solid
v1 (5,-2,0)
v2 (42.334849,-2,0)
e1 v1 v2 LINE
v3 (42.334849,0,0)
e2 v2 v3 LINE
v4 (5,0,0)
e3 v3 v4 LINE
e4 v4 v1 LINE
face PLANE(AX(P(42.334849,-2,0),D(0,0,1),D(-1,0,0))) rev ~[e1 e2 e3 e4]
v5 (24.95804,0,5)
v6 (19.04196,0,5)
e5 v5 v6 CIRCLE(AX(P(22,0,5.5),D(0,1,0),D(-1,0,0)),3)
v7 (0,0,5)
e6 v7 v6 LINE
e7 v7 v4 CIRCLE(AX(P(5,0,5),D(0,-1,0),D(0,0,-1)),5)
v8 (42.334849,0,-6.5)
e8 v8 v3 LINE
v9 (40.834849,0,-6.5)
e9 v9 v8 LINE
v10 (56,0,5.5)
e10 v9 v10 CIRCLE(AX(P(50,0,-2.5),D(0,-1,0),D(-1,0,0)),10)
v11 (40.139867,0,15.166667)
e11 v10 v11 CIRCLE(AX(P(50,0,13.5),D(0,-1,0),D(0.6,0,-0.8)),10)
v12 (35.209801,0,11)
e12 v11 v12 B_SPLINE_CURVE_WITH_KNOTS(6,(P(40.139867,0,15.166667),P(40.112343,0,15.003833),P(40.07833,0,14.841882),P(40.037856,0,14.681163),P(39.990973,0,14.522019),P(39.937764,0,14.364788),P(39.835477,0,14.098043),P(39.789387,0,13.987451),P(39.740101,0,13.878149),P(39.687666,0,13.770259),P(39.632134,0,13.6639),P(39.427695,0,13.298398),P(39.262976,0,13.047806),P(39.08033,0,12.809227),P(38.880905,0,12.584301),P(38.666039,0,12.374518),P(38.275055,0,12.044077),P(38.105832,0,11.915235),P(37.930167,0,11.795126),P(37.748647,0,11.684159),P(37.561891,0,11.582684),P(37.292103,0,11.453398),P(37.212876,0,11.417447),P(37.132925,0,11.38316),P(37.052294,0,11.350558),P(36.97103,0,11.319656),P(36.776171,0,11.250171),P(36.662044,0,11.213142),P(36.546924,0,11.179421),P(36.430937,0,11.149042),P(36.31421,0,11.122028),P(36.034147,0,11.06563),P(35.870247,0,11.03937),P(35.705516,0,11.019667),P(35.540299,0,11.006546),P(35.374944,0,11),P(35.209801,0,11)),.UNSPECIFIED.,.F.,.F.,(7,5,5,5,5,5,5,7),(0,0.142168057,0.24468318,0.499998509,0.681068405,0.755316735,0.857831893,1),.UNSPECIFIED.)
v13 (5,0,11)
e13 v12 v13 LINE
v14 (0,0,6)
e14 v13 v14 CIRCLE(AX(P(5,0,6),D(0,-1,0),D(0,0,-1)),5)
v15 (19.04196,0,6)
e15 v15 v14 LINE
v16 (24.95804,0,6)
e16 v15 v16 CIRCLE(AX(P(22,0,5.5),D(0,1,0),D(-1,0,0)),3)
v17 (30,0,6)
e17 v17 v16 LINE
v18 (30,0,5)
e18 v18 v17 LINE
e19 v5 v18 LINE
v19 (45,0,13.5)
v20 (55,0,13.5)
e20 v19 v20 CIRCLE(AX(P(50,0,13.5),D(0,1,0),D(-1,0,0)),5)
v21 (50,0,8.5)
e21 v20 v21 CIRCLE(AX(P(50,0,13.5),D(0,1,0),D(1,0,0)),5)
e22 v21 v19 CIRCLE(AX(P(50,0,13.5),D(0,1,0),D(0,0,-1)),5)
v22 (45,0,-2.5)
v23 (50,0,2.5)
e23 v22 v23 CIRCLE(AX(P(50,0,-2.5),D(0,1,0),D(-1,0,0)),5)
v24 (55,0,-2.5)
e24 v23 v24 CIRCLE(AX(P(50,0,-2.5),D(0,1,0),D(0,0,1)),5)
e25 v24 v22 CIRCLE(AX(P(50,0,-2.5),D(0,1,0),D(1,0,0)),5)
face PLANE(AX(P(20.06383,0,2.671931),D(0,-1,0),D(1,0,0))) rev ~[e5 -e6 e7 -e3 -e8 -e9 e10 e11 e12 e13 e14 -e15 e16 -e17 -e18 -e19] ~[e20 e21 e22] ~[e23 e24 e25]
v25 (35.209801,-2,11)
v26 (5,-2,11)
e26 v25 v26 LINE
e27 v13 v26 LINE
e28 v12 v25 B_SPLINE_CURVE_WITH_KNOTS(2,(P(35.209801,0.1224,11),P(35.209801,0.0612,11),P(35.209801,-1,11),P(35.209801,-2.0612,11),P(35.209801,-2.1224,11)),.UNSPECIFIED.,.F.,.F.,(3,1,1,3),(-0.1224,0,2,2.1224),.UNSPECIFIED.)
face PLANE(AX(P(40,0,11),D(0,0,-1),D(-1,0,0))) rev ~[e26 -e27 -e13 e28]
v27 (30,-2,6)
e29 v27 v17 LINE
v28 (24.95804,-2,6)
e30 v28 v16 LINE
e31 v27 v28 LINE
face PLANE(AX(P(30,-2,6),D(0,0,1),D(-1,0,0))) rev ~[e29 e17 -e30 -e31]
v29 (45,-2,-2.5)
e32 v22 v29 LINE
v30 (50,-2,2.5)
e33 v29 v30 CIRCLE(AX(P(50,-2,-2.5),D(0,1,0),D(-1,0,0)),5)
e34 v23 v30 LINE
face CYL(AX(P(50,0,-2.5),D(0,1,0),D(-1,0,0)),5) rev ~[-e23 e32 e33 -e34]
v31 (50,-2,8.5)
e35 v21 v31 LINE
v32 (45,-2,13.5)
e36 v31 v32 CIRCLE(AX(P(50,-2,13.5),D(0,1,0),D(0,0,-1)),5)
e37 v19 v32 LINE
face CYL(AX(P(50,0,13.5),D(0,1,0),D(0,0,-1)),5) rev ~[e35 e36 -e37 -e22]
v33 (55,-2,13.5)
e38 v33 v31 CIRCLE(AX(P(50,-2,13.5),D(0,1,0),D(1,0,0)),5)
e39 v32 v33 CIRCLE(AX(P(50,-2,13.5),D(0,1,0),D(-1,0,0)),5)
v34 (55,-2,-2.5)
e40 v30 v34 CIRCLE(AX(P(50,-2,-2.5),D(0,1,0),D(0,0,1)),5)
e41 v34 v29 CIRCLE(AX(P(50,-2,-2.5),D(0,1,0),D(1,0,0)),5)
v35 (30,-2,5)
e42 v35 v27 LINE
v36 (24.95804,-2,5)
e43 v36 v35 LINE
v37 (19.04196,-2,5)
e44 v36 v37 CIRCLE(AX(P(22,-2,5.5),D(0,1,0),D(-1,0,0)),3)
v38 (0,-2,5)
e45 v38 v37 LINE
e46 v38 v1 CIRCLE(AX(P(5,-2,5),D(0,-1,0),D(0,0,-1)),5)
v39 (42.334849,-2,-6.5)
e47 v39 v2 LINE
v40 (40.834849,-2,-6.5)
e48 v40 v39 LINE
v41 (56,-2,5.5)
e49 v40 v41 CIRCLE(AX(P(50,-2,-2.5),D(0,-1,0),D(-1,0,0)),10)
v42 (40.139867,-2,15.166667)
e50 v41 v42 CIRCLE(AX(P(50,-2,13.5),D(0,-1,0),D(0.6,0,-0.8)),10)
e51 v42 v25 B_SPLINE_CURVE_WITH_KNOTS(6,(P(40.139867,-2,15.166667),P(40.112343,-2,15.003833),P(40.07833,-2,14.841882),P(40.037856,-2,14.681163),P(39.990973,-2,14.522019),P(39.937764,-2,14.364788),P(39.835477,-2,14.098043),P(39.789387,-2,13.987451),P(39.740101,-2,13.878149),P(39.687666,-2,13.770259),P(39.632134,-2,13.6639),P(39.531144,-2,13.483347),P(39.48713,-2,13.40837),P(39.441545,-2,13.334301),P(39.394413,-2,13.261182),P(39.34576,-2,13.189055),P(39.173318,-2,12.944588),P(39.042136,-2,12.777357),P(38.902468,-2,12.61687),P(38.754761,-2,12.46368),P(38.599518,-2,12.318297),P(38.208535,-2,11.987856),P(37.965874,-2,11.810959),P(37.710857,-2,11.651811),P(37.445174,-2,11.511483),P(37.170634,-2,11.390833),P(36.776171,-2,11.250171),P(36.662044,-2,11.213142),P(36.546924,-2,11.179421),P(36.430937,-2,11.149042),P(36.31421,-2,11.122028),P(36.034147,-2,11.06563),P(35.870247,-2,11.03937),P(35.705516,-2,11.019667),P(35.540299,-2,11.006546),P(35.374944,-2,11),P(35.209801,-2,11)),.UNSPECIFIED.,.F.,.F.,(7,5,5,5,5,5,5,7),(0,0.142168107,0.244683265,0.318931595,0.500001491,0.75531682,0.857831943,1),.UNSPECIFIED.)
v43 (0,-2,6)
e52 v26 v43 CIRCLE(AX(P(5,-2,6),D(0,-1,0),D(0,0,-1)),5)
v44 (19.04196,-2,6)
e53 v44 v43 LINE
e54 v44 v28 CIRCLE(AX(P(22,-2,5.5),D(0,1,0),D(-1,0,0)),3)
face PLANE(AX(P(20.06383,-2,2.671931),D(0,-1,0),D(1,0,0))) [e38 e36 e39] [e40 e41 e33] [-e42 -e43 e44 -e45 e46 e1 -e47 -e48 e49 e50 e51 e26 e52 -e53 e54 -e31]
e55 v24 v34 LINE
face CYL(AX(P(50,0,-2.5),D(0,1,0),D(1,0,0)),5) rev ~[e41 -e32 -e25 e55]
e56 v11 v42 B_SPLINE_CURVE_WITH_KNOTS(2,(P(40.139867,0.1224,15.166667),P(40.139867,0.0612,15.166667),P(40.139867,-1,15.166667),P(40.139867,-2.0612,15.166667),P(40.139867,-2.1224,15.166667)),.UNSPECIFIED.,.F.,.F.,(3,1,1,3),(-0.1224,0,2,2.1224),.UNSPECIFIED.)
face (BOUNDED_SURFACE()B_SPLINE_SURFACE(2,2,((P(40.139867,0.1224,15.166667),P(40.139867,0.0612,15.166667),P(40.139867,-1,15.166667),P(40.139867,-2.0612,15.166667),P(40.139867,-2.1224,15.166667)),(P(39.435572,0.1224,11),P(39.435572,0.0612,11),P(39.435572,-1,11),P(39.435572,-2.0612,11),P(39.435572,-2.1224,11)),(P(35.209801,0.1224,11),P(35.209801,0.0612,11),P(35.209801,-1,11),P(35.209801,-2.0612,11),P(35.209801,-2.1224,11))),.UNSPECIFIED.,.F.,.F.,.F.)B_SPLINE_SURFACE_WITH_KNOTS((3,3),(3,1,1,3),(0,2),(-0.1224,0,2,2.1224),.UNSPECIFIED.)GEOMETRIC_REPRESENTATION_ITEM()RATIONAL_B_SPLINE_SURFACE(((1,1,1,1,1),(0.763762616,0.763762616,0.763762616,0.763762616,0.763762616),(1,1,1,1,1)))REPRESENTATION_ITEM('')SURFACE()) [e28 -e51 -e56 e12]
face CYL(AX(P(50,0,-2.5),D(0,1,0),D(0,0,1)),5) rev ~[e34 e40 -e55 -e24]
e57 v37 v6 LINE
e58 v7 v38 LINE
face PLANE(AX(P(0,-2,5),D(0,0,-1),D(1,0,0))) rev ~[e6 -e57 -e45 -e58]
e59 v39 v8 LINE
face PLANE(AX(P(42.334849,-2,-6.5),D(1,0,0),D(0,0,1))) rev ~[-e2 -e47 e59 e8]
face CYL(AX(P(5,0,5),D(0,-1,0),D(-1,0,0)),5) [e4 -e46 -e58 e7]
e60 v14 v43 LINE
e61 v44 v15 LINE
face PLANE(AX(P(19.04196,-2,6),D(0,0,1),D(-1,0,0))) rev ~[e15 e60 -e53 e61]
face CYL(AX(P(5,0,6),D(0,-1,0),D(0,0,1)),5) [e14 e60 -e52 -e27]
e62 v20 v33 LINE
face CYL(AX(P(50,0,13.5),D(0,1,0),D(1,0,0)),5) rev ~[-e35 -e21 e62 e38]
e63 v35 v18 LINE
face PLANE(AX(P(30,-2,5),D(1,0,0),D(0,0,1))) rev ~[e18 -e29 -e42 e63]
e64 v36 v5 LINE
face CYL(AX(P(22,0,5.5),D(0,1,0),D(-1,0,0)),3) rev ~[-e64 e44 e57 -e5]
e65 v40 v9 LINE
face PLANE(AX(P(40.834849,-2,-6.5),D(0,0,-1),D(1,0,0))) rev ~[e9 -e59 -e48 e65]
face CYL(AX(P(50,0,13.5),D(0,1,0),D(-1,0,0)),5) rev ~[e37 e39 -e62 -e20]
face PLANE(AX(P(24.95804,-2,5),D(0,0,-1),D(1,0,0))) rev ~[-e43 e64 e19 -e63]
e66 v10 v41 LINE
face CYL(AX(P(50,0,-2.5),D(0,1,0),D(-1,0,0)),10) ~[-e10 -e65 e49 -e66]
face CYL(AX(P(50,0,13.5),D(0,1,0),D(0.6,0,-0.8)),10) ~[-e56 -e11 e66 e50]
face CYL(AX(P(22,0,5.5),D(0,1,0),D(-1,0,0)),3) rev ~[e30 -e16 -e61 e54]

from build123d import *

# Parameters (mm, degrees)
F1_DEPTH = 2
F2_R     = 5
F4_DEPTH = 2
F6_DEPTH = 25


# Not quite as in the source:
# - a feature names something its author has since deleted; it is built from what else it names


with BuildPart() as f1:
    # F0 (on Front) → F1 (new body)
    with BuildSketch(Plane.XZ):
        with BuildLine():
            Line((0, 5.5), (0, 0))
            Line((0, 0), (40, 0))
            Line((40, 0), (40, 5.5))
            Line((40, 5.5), (25, 5.5))
            ThreePointArc((25, 5.5), (22, 2.5), (19, 5.5))
            Line((19, 5.5), (0, 5.5))
        make_face()
        with BuildLine():
            Line((40, 5.5), (40, 0))
            Line((40, 0), (40, -2.5))
            ThreePointArc((40, -2.5), (41.05572809, 1.972135955), (44, 5.5))
            Line((44, 5.5), (40, 5.5))
        make_face()
        with BuildLine():
            Line((0, 11), (0, 5.5))
            Line((0, 5.5), (19, 5.5))
            ThreePointArc((19, 5.5), (22, 8.5), (25, 5.5))
            Line((25, 5.5), (40, 5.5))
            Line((40, 5.5), (40, 11))
            Line((40, 11), (0, 11))
        make_face()
        with BuildLine():
            Line((40, 11), (40, 5.5))
            Line((40, 5.5), (44, 5.5))
            ThreePointArc((44, 5.5), (41.05572809, 9.027864045), (40, 13.5))
            Line((40, 13.5), (40, 11))
        make_face()
        with BuildLine():
            Line((45, -2.5), (40, -2.5))
            ThreePointArc((40, -2.5), (50, -12.5), (60, -2.5))
            ThreePointArc((60, -2.5), (58.94427191, 1.972135955), (56, 5.5))
            ThreePointArc((56, 5.5), (53.1622776602, 4.0131670195), (50, 3.5))
            Line((50, 3.5), (50, 2.5))
            ThreePointArc((50, 2.5), (53.5355339059, 1.0355339059), (55, -2.5))
            ThreePointArc((55, -2.5), (50, -7.5), (45, -2.5))
        make_face()
        with BuildLine():
            ThreePointArc((44, 5.5), (41.05572809, 1.972135955), (40, -2.5))
            Line((40, -2.5), (45, -2.5))
            ThreePointArc((45, -2.5), (46.4644660941, 1.0355339059), (50, 2.5))
            Line((50, 2.5), (50, 3.5))
            ThreePointArc((50, 3.5), (46.8377223398, 4.0131670195), (44, 5.5))
        make_face()
        with BuildLine():
            ThreePointArc((40, 13.5), (41.05572809, 9.027864045), (44, 5.5))
            ThreePointArc((44, 5.5), (46.8377223398, 6.9868329805), (50, 7.5))
            Line((50, 7.5), (50, 8.5))
            ThreePointArc((50, 8.5), (46.4644660941, 9.9644660941), (45, 13.5))
            Line((45, 13.5), (40, 13.5))
        make_face()
        with BuildLine():
            Line((50, 5.5), (44, 5.5))
            ThreePointArc((44, 5.5), (46.8377223398, 4.0131670195), (50, 3.5))
            Line((50, 3.5), (50, 5.5))
        make_face()
        with BuildLine():
            ThreePointArc((50, 7.5), (46.8377223398, 6.9868329805), (44, 5.5))
            Line((44, 5.5), (50, 5.5))
            Line((50, 5.5), (50, 7.5))
        make_face()
        with BuildLine():
            ThreePointArc((60, 13.5), (50, 23.5), (40, 13.5))
            Line((40, 13.5), (45, 13.5))
            ThreePointArc((45, 13.5), (50, 18.5), (55, 13.5))
            ThreePointArc((55, 13.5), (53.5355339059, 9.9644660941), (50, 8.5))
            Line((50, 8.5), (50, 7.5))
            ThreePointArc((50, 7.5), (53.1622776602, 6.9868329805), (56, 5.5))
            ThreePointArc((56, 5.5), (58.94427191, 9.027864045), (60, 13.5))
        make_face()
        with BuildLine():
            ThreePointArc((56, 5.5), (53.1622776602, 6.9868329805), (50, 7.5))
            Line((50, 7.5), (50, 5.5))
            Line((50, 5.5), (56, 5.5))
        make_face()
        with BuildLine():
            Line((50, 5.5), (50, 3.5))
            ThreePointArc((50, 3.5), (53.1622776602, 4.0131670195), (56, 5.5))
            Line((56, 5.5), (50, 5.5))
        make_face()
    extrude(amount=F1_DEPTH)

    # F2
    f2_edges = [f1.edges().sort_by_distance(p)[0] for p in [
        (40, -1, 11),
        (0, -1, 11),
        (0, -1, 0),
    ]]
    fillet(f2_edges, radius=F2_R)

    # F3 (on face) → F4 (cut, through all)
    with BuildSketch(Plane.XZ.offset(2)):
        with BuildLine():
            Line((19.0419601085, 6), (0, 6))
            Line((0, 6), (0, 5))
            Line((0, 5), (19.0419601085, 5))
            ThreePointArc((19.0419601085, 5), (19, 5.5), (19.0419601085, 6))
        make_face()
        with BuildLine():
            Line((30, 6), (24.9580398915, 6))
            ThreePointArc((24.9580398915, 6), (24.9894915684, 5.7508787808), (25, 5.5))
            ThreePointArc((25, 5.5), (24.9894915684, 5.2491212192), (24.9580398915, 5))
            Line((24.9580398915, 5), (30, 5))
            Line((30, 5), (30, 6))
        make_face()
    extrude(amount=-F4_DEPTH, mode=Mode.SUBTRACT)

    # F5 (on face) → F6 (cut)
    with BuildSketch(Plane.XZ.offset(2)):
        with BuildLine():
            ThreePointArc((40, -2.5), (40.2109368707, -4.5430964369), (40.8348486101, -6.5))
            Line((40.8348486101, -6.5), (42.3348486101, -6.5))
            Line((42.3348486101, -6.5), (42.3348486101, 0))
            Line((42.3348486101, 0), (40.3175416345, 0))
            ThreePointArc((40.3175416345, 0), (40.0797030373, -1.2399570752), (40, -2.5))
        make_face()
        with BuildLine():
            ThreePointArc((40, -2.5), (40.0797030373, -1.2399570752), (40.3175416345, 0))
            Line((40.3175416345, 0), (40, 0))
            Line((40, 0), (40, -2.5))
        make_face()
    extrude(amount=-F6_DEPTH, mode=Mode.SUBTRACT)


solid = f1.part
